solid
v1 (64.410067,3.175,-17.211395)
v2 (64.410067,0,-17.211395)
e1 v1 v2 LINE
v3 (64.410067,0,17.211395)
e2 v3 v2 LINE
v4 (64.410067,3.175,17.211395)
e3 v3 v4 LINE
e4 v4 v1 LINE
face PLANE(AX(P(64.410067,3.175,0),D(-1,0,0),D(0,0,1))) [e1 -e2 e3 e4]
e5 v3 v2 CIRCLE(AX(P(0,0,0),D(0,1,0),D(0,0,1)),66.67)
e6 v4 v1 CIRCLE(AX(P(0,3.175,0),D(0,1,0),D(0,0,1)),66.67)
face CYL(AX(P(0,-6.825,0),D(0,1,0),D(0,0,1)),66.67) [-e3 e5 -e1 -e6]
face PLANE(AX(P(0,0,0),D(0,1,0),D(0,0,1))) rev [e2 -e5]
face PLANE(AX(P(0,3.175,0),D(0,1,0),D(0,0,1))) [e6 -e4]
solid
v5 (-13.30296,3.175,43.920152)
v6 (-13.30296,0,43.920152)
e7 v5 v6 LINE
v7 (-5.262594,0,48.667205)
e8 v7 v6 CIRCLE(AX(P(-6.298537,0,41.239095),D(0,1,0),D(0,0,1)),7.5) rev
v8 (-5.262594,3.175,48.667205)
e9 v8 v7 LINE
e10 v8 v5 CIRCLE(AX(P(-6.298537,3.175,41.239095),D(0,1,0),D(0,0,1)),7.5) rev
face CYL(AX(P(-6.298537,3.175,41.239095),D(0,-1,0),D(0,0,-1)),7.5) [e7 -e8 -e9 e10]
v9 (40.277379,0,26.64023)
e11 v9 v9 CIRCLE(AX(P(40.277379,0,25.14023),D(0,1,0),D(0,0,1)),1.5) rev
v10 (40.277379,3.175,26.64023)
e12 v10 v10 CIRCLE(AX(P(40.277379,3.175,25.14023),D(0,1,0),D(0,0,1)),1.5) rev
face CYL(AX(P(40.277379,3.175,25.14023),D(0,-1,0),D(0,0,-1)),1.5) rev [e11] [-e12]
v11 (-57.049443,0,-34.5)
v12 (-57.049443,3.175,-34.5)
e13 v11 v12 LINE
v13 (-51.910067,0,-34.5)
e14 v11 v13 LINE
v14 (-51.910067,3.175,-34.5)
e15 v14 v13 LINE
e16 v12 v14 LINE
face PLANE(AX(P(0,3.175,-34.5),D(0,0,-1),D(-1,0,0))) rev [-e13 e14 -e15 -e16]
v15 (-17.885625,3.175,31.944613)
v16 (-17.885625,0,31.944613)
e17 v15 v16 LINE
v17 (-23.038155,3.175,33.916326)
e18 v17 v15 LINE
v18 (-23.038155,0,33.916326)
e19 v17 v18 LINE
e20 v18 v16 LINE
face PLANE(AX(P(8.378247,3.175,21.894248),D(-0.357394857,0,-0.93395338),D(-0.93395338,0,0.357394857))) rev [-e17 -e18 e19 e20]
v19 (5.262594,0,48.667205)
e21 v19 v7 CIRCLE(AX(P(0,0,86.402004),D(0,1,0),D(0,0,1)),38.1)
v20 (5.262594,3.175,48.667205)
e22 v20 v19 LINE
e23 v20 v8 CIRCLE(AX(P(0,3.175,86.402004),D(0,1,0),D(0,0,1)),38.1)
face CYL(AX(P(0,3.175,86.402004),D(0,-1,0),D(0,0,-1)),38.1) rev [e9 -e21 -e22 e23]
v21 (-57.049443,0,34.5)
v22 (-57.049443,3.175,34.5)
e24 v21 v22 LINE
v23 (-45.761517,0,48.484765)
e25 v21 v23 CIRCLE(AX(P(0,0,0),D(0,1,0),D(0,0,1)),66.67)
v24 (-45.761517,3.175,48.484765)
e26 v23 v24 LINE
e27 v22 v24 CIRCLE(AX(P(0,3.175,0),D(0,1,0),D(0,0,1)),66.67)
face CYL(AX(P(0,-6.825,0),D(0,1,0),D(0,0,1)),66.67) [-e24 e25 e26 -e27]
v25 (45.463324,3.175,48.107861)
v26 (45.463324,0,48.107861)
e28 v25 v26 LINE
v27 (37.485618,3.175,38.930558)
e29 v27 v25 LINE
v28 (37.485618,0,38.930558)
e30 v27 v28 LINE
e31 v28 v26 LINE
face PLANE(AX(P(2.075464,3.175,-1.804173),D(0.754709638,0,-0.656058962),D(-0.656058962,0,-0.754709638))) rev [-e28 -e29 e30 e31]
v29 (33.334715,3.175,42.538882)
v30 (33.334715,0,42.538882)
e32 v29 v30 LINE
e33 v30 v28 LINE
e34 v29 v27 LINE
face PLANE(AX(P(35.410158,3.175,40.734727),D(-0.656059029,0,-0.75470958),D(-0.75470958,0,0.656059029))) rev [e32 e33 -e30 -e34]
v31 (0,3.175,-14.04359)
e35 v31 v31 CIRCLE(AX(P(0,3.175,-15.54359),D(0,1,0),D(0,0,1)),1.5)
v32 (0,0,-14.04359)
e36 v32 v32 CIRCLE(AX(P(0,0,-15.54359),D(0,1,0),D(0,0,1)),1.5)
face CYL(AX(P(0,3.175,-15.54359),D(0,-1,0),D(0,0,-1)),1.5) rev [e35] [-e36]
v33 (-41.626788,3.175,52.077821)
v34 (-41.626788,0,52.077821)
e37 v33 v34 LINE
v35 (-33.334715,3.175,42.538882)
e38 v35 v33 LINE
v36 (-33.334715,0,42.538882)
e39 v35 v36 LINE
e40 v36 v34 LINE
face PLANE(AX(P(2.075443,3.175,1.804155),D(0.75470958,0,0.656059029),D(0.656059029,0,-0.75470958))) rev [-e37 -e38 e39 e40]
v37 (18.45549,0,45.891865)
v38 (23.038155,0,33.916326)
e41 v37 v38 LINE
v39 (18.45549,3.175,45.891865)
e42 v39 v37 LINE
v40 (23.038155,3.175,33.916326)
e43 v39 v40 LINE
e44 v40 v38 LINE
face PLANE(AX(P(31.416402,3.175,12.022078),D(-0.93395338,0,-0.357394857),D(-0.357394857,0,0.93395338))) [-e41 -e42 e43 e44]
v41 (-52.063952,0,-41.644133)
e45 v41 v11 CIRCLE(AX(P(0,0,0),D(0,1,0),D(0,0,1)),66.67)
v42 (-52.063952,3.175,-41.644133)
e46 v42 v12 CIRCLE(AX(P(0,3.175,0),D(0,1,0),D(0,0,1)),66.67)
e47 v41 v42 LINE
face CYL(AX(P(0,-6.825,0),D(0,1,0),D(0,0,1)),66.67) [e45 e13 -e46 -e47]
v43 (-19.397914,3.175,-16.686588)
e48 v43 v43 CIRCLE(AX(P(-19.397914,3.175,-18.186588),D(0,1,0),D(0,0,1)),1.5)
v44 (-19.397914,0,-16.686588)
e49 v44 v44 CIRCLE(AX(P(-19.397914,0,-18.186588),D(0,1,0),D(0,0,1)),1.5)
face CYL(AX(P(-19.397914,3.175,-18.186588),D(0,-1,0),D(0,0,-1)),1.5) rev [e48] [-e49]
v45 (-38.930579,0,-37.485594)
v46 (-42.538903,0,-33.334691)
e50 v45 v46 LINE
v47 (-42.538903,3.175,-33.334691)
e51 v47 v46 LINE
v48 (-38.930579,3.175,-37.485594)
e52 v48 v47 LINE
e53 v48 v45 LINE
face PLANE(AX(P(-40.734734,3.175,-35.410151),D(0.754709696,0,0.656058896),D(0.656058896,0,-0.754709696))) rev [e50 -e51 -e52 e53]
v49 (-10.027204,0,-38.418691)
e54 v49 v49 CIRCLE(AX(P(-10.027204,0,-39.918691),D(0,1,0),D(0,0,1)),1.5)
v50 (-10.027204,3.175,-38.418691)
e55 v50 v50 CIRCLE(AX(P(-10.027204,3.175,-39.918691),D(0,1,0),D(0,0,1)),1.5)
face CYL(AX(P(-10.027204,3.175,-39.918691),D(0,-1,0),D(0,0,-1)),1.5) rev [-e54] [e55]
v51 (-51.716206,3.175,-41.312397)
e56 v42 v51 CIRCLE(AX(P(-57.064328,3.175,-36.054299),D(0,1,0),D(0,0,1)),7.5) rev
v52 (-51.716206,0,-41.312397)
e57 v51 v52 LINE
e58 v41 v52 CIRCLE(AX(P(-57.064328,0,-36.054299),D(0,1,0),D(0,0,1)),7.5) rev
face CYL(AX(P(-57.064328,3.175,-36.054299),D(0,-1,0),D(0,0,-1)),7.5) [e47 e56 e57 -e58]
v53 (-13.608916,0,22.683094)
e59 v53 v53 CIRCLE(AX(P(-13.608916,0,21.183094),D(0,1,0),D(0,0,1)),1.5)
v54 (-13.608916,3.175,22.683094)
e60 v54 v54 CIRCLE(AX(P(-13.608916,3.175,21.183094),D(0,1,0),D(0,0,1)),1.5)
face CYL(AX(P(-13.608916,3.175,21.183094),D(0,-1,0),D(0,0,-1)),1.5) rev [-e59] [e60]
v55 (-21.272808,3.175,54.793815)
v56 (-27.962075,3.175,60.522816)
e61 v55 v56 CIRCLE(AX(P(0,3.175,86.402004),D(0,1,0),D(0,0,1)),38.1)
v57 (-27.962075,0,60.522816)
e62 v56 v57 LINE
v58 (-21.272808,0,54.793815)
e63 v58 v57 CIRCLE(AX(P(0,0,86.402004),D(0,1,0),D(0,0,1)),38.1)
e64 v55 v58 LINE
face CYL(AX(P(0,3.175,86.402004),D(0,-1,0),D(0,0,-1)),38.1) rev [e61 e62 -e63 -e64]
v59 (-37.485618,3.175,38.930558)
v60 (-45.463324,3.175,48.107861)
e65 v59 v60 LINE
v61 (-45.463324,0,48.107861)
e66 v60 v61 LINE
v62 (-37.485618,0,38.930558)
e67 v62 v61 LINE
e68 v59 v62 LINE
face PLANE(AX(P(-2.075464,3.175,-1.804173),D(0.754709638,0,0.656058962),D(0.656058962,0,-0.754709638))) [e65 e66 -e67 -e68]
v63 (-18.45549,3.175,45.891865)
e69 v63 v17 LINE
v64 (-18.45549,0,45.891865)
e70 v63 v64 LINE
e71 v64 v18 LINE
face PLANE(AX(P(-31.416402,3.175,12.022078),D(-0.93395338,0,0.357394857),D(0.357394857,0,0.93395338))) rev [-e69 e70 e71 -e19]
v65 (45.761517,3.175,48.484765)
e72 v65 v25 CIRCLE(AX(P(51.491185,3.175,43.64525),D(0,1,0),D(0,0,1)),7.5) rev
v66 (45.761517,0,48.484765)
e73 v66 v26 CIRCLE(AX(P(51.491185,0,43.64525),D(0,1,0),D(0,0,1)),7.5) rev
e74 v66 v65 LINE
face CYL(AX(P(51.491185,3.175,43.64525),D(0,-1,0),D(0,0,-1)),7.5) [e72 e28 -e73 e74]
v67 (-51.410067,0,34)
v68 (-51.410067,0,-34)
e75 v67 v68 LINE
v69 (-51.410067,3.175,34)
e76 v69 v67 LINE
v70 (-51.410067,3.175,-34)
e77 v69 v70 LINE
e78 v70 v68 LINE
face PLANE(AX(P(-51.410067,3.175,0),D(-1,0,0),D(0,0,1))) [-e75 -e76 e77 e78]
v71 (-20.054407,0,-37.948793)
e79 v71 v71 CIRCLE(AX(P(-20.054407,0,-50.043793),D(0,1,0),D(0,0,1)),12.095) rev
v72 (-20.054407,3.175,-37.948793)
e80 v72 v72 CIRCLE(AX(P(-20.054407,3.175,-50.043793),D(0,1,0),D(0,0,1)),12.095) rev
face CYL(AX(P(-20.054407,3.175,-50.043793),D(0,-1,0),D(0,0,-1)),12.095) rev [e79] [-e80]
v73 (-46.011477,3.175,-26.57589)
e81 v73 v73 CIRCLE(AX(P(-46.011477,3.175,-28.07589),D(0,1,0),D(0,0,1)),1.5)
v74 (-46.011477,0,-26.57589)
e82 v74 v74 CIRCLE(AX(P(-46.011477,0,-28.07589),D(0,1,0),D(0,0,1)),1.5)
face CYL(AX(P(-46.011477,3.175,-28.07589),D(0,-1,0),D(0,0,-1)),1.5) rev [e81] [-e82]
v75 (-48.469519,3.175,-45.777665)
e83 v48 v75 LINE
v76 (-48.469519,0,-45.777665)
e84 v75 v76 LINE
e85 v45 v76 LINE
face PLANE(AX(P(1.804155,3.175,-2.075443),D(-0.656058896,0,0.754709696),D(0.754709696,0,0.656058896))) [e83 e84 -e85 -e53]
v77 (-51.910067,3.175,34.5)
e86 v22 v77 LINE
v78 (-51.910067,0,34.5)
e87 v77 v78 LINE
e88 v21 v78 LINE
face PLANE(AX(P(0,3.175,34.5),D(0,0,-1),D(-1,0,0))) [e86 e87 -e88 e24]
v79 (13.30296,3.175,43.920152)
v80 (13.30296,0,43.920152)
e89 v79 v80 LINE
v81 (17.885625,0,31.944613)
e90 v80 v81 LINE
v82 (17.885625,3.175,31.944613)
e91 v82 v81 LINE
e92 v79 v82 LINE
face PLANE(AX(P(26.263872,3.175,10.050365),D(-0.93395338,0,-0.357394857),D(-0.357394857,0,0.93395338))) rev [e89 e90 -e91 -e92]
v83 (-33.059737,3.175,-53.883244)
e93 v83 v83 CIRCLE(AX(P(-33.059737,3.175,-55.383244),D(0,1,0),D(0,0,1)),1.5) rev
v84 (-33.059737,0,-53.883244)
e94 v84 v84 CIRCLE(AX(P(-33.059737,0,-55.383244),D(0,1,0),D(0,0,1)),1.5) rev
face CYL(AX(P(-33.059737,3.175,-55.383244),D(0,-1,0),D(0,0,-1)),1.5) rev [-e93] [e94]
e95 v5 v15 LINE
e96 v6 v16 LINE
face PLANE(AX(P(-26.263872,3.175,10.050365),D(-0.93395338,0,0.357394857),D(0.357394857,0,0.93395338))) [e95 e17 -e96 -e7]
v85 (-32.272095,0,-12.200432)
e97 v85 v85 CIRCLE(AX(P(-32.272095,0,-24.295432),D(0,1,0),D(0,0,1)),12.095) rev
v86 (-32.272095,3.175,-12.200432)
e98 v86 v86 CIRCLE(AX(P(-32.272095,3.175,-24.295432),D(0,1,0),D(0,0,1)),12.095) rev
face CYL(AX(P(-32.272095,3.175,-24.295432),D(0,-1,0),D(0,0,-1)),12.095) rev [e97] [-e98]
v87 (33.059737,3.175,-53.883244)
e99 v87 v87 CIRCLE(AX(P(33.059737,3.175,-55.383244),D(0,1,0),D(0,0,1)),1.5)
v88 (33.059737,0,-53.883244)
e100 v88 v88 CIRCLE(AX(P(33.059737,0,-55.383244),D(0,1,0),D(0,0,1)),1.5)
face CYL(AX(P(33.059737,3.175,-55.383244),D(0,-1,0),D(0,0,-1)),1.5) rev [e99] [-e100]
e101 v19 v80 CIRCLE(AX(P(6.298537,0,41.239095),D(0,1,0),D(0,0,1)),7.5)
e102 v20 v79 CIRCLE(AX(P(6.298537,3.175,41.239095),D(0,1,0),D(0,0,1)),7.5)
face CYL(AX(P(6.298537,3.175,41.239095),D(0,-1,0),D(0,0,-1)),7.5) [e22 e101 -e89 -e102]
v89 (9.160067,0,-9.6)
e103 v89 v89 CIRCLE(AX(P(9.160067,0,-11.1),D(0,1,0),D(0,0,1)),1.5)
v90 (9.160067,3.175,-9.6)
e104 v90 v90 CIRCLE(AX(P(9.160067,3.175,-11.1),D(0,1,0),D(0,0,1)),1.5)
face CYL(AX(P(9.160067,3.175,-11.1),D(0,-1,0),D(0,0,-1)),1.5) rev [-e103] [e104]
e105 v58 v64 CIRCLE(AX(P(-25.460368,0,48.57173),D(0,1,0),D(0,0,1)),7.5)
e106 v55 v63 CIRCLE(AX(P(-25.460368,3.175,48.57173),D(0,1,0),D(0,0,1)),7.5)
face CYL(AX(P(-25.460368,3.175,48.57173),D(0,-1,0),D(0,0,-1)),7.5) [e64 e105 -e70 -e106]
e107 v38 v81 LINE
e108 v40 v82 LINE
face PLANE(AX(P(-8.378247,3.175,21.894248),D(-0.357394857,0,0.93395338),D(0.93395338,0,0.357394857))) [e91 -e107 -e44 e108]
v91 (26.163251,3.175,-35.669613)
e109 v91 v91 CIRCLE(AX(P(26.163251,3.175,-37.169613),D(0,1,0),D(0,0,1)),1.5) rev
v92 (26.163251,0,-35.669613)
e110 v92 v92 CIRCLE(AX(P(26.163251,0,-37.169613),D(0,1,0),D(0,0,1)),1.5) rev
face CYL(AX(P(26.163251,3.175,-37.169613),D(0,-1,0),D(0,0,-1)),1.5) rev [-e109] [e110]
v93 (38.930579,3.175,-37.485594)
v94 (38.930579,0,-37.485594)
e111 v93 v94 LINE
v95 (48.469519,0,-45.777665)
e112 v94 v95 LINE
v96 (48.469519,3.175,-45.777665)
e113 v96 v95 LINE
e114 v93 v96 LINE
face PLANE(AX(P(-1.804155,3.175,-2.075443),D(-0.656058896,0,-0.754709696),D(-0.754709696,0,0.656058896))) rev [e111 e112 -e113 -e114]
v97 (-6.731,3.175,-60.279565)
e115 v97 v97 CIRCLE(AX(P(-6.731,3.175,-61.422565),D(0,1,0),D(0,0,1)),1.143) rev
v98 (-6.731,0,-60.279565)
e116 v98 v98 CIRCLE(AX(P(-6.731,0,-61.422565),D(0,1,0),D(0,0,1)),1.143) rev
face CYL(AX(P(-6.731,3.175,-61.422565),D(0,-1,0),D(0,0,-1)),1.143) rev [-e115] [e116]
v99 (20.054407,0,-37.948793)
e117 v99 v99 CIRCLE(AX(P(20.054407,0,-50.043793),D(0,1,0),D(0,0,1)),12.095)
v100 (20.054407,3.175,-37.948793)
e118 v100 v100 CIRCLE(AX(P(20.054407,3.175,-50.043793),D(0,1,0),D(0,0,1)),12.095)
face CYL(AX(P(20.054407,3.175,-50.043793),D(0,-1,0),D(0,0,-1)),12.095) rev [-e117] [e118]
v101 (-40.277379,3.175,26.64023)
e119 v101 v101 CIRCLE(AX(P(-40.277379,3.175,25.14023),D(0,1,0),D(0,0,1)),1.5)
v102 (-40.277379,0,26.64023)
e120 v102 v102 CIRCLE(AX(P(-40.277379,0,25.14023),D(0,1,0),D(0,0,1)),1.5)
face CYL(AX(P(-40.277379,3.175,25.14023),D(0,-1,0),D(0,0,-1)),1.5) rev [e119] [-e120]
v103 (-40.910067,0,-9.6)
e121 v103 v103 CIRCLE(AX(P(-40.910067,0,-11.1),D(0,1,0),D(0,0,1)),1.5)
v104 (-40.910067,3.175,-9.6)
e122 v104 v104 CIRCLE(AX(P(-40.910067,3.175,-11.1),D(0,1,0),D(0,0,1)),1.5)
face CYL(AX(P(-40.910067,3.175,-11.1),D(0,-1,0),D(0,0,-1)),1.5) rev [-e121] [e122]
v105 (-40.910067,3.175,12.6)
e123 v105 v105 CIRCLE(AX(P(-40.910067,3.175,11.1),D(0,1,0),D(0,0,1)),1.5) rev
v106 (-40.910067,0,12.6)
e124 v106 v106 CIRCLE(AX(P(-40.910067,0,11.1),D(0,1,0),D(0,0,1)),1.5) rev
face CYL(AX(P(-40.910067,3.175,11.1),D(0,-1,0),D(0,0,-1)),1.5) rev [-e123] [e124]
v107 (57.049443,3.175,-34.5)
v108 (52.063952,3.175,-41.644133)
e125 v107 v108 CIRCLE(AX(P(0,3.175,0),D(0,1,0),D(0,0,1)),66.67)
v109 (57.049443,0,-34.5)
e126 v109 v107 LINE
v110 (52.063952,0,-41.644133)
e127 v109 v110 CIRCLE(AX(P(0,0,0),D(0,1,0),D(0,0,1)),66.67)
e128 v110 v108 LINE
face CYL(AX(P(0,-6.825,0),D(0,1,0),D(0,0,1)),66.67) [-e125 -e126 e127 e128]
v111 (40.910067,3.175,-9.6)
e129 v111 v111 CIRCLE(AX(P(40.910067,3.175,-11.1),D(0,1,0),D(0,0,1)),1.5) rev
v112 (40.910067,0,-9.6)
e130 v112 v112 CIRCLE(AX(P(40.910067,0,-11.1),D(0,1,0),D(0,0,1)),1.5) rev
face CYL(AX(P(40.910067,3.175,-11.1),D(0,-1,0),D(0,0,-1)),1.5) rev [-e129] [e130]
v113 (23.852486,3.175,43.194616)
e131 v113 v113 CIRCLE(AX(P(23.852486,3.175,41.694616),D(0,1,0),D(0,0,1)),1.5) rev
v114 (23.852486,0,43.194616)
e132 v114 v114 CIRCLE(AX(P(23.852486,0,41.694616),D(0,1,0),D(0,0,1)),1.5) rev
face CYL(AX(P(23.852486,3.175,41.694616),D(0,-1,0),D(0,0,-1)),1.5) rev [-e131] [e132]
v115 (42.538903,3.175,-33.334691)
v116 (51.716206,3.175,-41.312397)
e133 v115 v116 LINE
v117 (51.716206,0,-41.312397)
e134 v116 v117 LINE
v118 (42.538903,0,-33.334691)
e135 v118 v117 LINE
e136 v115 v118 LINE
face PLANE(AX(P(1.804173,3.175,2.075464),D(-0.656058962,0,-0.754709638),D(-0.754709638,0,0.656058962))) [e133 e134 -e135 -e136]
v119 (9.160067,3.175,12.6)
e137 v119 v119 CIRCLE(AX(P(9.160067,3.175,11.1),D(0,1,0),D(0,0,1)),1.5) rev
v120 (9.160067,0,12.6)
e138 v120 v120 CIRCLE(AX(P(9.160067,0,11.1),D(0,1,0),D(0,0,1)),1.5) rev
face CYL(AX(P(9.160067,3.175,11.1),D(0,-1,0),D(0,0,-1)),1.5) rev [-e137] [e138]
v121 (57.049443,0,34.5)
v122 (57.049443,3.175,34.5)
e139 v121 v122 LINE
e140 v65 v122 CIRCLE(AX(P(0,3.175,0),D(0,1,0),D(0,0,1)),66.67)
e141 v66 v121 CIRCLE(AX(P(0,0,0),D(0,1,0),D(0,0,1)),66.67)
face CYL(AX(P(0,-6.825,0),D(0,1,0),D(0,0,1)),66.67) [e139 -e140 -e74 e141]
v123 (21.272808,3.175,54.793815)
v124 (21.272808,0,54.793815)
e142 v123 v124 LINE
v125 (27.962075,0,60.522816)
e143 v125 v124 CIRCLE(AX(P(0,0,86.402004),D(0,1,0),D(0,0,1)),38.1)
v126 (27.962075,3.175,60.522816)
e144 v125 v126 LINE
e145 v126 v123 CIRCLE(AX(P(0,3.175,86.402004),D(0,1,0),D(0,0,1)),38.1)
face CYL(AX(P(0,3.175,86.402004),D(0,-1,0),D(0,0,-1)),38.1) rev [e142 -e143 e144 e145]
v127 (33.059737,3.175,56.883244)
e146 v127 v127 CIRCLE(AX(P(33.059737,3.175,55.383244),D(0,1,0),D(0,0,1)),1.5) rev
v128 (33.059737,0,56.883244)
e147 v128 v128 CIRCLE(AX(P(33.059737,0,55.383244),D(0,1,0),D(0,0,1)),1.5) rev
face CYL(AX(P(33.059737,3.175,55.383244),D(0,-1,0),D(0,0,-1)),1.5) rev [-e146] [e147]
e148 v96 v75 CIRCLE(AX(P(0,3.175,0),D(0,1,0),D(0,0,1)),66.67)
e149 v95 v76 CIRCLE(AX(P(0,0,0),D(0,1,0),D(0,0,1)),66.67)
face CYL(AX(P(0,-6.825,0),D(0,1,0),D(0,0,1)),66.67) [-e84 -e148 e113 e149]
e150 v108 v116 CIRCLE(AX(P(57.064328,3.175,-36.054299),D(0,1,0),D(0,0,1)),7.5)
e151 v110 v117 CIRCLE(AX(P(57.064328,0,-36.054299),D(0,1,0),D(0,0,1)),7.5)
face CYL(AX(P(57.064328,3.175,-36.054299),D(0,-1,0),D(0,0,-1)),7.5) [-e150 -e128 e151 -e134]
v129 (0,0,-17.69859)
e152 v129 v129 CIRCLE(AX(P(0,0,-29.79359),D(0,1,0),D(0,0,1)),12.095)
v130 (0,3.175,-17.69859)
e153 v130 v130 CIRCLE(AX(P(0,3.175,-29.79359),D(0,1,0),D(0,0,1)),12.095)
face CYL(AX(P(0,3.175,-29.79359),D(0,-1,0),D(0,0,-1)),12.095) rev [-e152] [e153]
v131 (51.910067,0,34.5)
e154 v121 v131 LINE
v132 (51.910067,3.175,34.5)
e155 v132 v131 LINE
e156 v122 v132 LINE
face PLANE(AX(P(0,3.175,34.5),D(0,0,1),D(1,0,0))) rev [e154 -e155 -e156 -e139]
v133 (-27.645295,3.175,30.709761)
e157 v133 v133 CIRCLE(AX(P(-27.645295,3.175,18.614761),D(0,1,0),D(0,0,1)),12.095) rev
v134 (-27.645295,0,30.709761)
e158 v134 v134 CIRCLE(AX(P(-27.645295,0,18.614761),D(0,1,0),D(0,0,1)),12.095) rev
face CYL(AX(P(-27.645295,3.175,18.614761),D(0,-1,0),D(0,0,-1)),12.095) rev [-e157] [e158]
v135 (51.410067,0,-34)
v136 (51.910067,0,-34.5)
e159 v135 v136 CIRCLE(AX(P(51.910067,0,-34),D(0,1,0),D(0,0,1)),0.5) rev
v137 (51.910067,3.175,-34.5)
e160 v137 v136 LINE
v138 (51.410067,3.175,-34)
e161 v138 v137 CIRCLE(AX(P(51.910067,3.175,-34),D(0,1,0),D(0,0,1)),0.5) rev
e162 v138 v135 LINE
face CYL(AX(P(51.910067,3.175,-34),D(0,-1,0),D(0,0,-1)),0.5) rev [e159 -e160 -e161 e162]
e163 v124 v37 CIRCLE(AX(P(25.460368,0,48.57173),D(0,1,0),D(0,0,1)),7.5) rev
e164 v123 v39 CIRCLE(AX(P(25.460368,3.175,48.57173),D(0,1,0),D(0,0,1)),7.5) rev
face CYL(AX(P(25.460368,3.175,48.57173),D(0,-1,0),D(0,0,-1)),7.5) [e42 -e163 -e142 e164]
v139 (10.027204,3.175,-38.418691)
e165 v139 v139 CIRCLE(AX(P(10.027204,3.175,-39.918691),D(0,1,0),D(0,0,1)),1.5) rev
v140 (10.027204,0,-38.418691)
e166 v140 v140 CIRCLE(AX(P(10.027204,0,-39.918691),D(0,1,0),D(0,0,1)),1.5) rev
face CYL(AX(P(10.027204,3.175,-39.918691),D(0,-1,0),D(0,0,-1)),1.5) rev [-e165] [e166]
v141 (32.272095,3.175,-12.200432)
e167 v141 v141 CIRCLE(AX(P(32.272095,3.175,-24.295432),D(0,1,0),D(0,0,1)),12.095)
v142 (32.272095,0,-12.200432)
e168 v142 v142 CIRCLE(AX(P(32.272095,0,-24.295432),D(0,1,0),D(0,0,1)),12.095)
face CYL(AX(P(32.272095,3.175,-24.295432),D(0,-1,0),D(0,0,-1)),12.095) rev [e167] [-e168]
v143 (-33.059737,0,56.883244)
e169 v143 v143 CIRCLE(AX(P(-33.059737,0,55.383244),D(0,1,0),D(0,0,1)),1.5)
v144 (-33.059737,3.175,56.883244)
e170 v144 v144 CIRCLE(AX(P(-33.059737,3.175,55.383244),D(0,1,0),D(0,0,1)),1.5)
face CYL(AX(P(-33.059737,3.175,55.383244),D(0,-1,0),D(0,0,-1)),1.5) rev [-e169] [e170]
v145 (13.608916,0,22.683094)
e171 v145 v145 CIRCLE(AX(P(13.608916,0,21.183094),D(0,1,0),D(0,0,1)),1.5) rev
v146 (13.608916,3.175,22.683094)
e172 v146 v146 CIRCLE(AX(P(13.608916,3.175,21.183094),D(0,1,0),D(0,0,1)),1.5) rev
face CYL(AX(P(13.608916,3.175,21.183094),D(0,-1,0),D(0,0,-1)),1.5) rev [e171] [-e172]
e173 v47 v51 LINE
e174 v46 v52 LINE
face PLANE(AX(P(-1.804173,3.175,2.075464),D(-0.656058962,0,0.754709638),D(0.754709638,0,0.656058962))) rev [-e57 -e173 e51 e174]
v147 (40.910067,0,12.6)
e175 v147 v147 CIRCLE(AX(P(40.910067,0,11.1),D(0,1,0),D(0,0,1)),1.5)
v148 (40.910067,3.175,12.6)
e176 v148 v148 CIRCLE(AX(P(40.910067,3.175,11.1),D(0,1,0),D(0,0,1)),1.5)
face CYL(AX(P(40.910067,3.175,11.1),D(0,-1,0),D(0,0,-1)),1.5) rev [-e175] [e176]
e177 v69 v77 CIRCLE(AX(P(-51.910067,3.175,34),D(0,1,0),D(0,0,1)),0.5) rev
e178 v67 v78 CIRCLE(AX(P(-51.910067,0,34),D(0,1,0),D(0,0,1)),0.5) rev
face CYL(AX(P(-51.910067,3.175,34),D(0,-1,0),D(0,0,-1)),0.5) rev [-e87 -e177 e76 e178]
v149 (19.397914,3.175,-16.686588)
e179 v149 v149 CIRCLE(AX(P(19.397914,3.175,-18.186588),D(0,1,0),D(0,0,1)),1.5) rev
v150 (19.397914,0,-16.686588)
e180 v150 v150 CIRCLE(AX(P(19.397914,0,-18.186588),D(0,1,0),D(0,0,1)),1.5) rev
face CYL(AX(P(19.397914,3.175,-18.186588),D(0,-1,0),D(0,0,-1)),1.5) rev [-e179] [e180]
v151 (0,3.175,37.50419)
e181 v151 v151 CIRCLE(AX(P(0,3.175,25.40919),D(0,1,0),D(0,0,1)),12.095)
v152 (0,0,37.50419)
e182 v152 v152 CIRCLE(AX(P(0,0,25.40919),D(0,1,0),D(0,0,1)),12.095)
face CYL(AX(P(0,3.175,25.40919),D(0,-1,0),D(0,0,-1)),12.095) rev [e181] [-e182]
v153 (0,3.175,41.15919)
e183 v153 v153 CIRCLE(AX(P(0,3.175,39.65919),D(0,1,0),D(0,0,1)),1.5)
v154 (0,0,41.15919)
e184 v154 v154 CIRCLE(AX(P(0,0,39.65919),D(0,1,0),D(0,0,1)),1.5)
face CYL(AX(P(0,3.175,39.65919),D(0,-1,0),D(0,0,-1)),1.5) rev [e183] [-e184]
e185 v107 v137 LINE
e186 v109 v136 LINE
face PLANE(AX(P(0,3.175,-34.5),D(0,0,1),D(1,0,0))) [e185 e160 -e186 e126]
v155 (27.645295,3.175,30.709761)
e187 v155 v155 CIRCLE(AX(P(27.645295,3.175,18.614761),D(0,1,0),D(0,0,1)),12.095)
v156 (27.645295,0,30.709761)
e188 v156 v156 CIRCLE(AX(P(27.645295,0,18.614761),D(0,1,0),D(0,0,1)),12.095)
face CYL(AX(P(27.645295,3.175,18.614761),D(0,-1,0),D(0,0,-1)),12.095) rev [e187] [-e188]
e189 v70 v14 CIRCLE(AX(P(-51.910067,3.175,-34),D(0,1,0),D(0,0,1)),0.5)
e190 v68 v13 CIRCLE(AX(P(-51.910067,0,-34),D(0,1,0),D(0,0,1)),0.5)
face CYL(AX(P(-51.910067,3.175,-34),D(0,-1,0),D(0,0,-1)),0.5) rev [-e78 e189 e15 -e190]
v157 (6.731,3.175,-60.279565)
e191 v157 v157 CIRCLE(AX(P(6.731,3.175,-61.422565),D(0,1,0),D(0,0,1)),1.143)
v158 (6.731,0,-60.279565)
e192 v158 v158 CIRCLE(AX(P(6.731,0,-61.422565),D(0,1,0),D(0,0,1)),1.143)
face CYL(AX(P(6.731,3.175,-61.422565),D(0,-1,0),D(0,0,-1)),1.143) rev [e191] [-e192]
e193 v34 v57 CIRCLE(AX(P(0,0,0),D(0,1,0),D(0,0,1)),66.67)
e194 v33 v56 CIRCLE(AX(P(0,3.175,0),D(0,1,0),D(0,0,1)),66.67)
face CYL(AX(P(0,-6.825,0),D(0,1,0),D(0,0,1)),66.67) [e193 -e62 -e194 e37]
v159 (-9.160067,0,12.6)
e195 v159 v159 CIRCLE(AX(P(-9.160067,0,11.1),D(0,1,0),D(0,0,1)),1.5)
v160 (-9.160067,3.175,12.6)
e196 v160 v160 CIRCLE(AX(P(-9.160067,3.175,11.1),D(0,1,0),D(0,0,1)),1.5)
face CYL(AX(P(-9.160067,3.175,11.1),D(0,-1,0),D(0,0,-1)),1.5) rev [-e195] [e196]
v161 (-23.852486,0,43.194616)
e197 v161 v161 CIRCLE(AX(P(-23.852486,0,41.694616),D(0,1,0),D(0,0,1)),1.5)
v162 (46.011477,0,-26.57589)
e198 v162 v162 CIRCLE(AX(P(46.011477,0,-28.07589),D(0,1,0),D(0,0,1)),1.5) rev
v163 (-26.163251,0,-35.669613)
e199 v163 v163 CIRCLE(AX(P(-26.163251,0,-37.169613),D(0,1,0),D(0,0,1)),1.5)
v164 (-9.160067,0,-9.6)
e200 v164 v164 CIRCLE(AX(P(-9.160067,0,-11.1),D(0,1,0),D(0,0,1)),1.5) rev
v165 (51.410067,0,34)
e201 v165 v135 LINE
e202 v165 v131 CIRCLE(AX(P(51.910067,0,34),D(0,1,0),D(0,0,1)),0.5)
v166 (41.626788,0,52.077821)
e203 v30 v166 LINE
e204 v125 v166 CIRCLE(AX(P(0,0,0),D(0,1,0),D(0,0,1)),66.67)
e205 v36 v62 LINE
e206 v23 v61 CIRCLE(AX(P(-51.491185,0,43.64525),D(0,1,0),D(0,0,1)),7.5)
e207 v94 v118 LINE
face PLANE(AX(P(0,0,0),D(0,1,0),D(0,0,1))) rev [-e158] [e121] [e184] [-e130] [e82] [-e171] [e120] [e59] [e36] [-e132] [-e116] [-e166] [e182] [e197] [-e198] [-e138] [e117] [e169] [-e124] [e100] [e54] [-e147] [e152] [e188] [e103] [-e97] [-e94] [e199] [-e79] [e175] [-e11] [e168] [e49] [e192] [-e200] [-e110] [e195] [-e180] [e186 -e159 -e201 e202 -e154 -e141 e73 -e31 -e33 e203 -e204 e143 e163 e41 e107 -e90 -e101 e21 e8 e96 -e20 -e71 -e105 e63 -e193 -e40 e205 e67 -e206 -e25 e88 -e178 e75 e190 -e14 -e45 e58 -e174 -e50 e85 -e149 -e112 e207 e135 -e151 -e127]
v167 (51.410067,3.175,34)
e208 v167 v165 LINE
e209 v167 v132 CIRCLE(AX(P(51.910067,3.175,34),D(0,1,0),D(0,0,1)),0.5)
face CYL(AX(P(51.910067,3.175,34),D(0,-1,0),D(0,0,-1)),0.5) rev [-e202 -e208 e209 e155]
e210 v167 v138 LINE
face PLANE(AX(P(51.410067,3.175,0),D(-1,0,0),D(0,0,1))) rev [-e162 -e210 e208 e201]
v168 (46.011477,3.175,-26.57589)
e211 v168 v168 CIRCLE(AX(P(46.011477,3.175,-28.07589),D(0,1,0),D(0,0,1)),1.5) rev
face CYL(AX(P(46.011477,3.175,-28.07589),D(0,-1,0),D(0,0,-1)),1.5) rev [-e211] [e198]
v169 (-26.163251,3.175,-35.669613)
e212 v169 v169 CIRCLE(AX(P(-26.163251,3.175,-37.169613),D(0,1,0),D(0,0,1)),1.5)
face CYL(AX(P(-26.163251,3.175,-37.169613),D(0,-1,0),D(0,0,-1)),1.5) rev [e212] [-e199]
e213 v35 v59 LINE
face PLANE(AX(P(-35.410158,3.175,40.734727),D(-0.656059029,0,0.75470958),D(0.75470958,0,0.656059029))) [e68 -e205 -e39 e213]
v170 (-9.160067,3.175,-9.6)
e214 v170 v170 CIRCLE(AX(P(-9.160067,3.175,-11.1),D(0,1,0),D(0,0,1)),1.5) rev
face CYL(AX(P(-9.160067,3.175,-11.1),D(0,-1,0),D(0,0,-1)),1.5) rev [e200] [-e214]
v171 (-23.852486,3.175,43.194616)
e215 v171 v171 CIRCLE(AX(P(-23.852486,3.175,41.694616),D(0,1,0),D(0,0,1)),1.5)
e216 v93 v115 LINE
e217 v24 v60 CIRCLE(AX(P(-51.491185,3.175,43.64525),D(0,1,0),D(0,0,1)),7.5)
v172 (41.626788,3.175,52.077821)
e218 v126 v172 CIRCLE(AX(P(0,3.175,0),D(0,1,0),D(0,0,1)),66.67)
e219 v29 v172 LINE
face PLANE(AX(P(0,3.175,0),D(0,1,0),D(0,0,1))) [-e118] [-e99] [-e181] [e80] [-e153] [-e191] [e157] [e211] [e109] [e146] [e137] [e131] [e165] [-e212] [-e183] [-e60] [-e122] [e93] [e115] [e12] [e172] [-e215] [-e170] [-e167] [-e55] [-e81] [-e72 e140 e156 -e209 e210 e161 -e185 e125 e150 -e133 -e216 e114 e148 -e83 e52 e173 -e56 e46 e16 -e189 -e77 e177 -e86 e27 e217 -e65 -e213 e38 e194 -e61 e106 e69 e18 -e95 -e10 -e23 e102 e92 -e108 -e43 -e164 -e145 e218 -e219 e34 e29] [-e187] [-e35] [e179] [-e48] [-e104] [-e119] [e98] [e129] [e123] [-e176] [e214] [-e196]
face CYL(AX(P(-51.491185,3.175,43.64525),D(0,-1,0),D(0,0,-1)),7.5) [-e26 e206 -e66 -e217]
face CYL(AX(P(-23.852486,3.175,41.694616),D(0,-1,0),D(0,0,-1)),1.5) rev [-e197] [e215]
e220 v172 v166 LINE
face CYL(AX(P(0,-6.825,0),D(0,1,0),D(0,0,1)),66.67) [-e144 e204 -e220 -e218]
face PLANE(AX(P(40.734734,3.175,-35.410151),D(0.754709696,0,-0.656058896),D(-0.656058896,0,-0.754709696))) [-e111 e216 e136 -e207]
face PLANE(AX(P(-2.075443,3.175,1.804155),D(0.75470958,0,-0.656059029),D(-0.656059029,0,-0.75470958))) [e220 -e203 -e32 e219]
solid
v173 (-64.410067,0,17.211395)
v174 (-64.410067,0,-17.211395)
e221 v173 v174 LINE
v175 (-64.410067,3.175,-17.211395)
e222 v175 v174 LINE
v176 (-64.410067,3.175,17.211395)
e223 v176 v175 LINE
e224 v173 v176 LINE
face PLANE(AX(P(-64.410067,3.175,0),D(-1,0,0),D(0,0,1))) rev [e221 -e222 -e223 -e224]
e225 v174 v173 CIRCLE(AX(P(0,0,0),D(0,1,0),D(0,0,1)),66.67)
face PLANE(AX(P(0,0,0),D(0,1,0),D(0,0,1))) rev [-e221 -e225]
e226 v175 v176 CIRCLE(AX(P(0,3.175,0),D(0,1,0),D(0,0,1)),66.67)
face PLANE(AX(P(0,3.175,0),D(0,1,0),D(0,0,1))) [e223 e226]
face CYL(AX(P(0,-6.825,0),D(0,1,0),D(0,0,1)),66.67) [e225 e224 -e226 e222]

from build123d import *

# Parameters (mm, degrees)
BOSS_EXTRUDE1_OUTLINE_R   = 1.5
BOSS_EXTRUDE1_OUTLINE_R_2 = 12.095
BOSS_EXTRUDE1_OUTLINE_R_3 = 1.143
BOSS_EXTRUDE1_DEPTH       = 3.175
SKETCH2_R                 = 88.839180513
SKETCH2_R_2               = 66.67
CUT_EXTRUDE1_DEPTH        = 10


# Read off the part's stored shape, not the designer's step: Boss-Extrude1
with BuildPart() as part:
    # Boss-Extrude1 outline → Boss-Extrude1 (new body)
    with BuildSketch(Plane(origin=(0, 0, 0), x_dir=(1, 0, 0), z_dir=(0, 1, 0))):
        with BuildLine():
            Line((-45.463324447, -48.107860638), (-37.485618015, -38.930557561))
            Line((-37.485618015, -38.930557561), (-33.334715323, -42.538882221))
            Line((-33.334715323, -42.538882221), (-41.689597364, -52.150074566))
            ThreePointArc((-41.689597364, -52.150074566), (-43.455441803, -58.16401862), (-40.038526845, -63.418580622))
            ThreePointArc((-40.038526845, -63.418580622), (-37.79111892, -64.782955558), (-35.49727084, -66.067721036))
            ThreePointArc((-35.49727084, -66.067721036), (-33.357679643, -66.33740492), (-31.589980006, -65.102164912))
            ThreePointArc((-31.589980006, -65.102164912), (-26.929242455, -59.449715082), (-21.272807595, -54.79381471))
            ThreePointArc((-21.272807595, -54.79381471), (-18.309924074, -50.834725832), (-18.455489673, -45.891864903))
            Line((-18.455489673, -45.891864903), (-23.038155213, -33.91632612))
            Line((-23.038155213, -33.91632612), (-17.885625128, -31.944613407))
            Line((-17.885625128, -31.944613407), (-13.302959587, -43.920152189))
            ThreePointArc((-13.302959587, -43.920152189), (-10.111582251, -47.697475872), (-5.262593756, -48.667204744))
            ThreePointArc((-5.262593756, -48.667204744), (0, -48.302004425), (5.262593756, -48.667204744))
            ThreePointArc((5.262593756, -48.667204744), (10.111582251, -47.697475872), (13.302959587, -43.920152189))
            Line((13.302959587, -43.920152189), (17.885625128, -31.944613407))
            Line((17.885625128, -31.944613407), (23.038155213, -33.91632612))
            Line((23.038155213, -33.91632612), (18.455489673, -45.891864903))
            ThreePointArc((18.455489673, -45.891864903), (18.309924074, -50.834725832), (21.272807595, -54.79381471))
            ThreePointArc((21.272807595, -54.79381471), (26.929242455, -59.449715082), (31.589980006, -65.102164912))
            ThreePointArc((31.589980006, -65.102164912), (33.357679643, -66.33740492), (35.49727084, -66.067721036))
            ThreePointArc((35.49727084, -66.067721036), (37.79111892, -64.782955558), (40.038526845, -63.418580622))
            ThreePointArc((40.038526845, -63.418580622), (43.455441803, -58.16401862), (41.689597364, -52.150074566))
            Line((41.689597364, -52.150074566), (33.334715323, -42.538882221))
            Line((33.334715323, -42.538882221), (37.485618015, -38.930557561))
            Line((37.485618015, -38.930557561), (45.463324447, -48.107860638))
            ThreePointArc((45.463324447, -48.107860638), (51.244367279, -51.141187567), (57.212428046, -48.494722157))
            ThreePointArc((57.212428046, -48.494722157), (74.817303308, -5.231742133), (63.404808562, 40.06033264))
            ThreePointArc((63.404808562, 40.06033264), (57.863145959, 43.511637332), (51.716205935, 41.312397275))
            Line((51.716205935, 41.312397275), (42.538902858, 33.334690843))
            Line((42.538902858, 33.334690843), (38.930578931, 37.485594171))
            Line((38.930578931, 37.485594171), (48.541772751, 45.840474516))
            ThreePointArc((48.541772751, 45.840474516), (51.127412363, 51.550132777), (48.475045278, 57.229100861))
            ThreePointArc((48.475045278, 57.229100861), (0, 75), (-48.475045278, 57.229100861))
            ThreePointArc((-48.475045278, 57.229100861), (-51.127412363, 51.550132777), (-48.541772751, 45.840474516))
            Line((-48.541772751, 45.840474516), (-38.930578931, 37.485594171))
            Line((-38.930578931, 37.485594171), (-42.538902858, 33.334690843))
            Line((-42.538902858, 33.334690843), (-51.716205935, 41.312397275))
            ThreePointArc((-51.716205935, 41.312397275), (-57.863145959, 43.511637332), (-63.404808562, 40.06033264))
            ThreePointArc((-63.404808562, 40.06033264), (-74.817303308, -5.231742133), (-57.212428046, -48.494722157))
            ThreePointArc((-57.212428046, -48.494722157), (-51.244367279, -51.141187567), (-45.463324447, -48.107860638))
        make_face()
        with Locations((-33.059737365, -55.383244446)):
            Circle(BOSS_EXTRUDE1_OUTLINE_R, mode=Mode.SUBTRACT)
        with Locations((-23.852486199, -41.694616163)):
            Circle(BOSS_EXTRUDE1_OUTLINE_R, mode=Mode.SUBTRACT)
        with Locations((-40.277379234, -25.14022965)):
            Circle(BOSS_EXTRUDE1_OUTLINE_R, mode=Mode.SUBTRACT)
        with BuildLine():
            Line((-64.410067426, -34), (-64.410067426, 34))
            ThreePointArc((-64.410067426, 34), (-64.263620817, 34.353553391), (-63.910067426, 34.5))
            Line((-63.910067426, 34.5), (-51.910067426, 34.5))
            ThreePointArc((-51.910067426, 34.5), (-51.556514035, 34.353553391), (-51.410067426, 34))
            Line((-51.410067426, 34), (-51.410067426, -34))
            ThreePointArc((-51.410067426, -34), (-51.556514035, -34.353553391), (-51.910067426, -34.5))
            Line((-51.910067426, -34.5), (-63.910067426, -34.5))
            ThreePointArc((-63.910067426, -34.5), (-64.263620817, -34.353553391), (-64.410067426, -34))
        make_face(mode=Mode.SUBTRACT)
        with Locations((-40.910067426, -11.1)):
            Circle(BOSS_EXTRUDE1_OUTLINE_R, mode=Mode.SUBTRACT)
        with Locations((-27.645294552, -18.614761308)):
            Circle(BOSS_EXTRUDE1_OUTLINE_R_2, mode=Mode.SUBTRACT)
        with Locations((-13.608916499, -21.183093811)):
            Circle(BOSS_EXTRUDE1_OUTLINE_R, mode=Mode.SUBTRACT)
        with Locations((-9.160067426, -11.1)):
            Circle(BOSS_EXTRUDE1_OUTLINE_R, mode=Mode.SUBTRACT)
        with Locations((33.059737365, -55.383244446)):
            Circle(BOSS_EXTRUDE1_OUTLINE_R, mode=Mode.SUBTRACT)
        with Locations((0, -39.659190322)):
            Circle(BOSS_EXTRUDE1_OUTLINE_R, mode=Mode.SUBTRACT)
        with Locations((23.852486199, -41.694616163)):
            Circle(BOSS_EXTRUDE1_OUTLINE_R, mode=Mode.SUBTRACT)
        with Locations((0, -25.409190322)):
            Circle(BOSS_EXTRUDE1_OUTLINE_R_2, mode=Mode.SUBTRACT)
        with Locations((13.608916499, -21.183093811)):
            Circle(BOSS_EXTRUDE1_OUTLINE_R, mode=Mode.SUBTRACT)
        with Locations((27.645294552, -18.614761308)):
            Circle(BOSS_EXTRUDE1_OUTLINE_R_2, mode=Mode.SUBTRACT)
        with Locations((9.160067426, -11.1)):
            Circle(BOSS_EXTRUDE1_OUTLINE_R, mode=Mode.SUBTRACT)
        with Locations((40.277379234, -25.14022965)):
            Circle(BOSS_EXTRUDE1_OUTLINE_R, mode=Mode.SUBTRACT)
        with Locations((40.910067426, -11.1)):
            Circle(BOSS_EXTRUDE1_OUTLINE_R, mode=Mode.SUBTRACT)
        with BuildLine():
            ThreePointArc((63.910067426, 34.5), (64.263620817, 34.353553391), (64.410067426, 34))
            Line((64.410067426, 34), (64.410067426, -34))
            ThreePointArc((64.410067426, -34), (64.263620817, -34.353553391), (63.910067426, -34.5))
            Line((63.910067426, -34.5), (51.910067426, -34.5))
            ThreePointArc((51.910067426, -34.5), (51.556514035, -34.353553391), (51.410067426, -34))
            Line((51.410067426, -34), (51.410067426, 34))
            ThreePointArc((51.410067426, 34), (51.556514035, 34.353553391), (51.910067426, 34.5))
            Line((51.910067426, 34.5), (63.910067426, 34.5))
        make_face(mode=Mode.SUBTRACT)
        with Locations((-40.910067426, 11.1)):
            Circle(BOSS_EXTRUDE1_OUTLINE_R, mode=Mode.SUBTRACT)
        with Locations((-46.011477091, 28.075890486)):
            Circle(BOSS_EXTRUDE1_OUTLINE_R, mode=Mode.SUBTRACT)
        with Locations((-19.397913834, 18.186588214)):
            Circle(BOSS_EXTRUDE1_OUTLINE_R, mode=Mode.SUBTRACT)
        with Locations((-9.160067426, 11.1)):
            Circle(BOSS_EXTRUDE1_OUTLINE_R, mode=Mode.SUBTRACT)
        with Locations((-32.272094543, 24.295431891)):
            Circle(BOSS_EXTRUDE1_OUTLINE_R_2, mode=Mode.SUBTRACT)
        with Locations((-26.163250867, 37.1696126)):
            Circle(BOSS_EXTRUDE1_OUTLINE_R, mode=Mode.SUBTRACT)
        with Locations((-33.059737365, 55.383244446)):
            Circle(BOSS_EXTRUDE1_OUTLINE_R, mode=Mode.SUBTRACT)
        with Locations((-20.05440719, 50.04379331)):
            Circle(BOSS_EXTRUDE1_OUTLINE_R_2, mode=Mode.SUBTRACT)
        with Locations((-10.027203595, 39.91869143)):
            Circle(BOSS_EXTRUDE1_OUTLINE_R, mode=Mode.SUBTRACT)
        with Locations((-6.731, 61.422565207)):
            Circle(BOSS_EXTRUDE1_OUTLINE_R_3, mode=Mode.SUBTRACT)
        with Locations((9.160067426, 11.1)):
            Circle(BOSS_EXTRUDE1_OUTLINE_R, mode=Mode.SUBTRACT)
        with Locations((0, 15.543589551)):
            Circle(BOSS_EXTRUDE1_OUTLINE_R, mode=Mode.SUBTRACT)
        with Locations((19.397913834, 18.186588214)):
            Circle(BOSS_EXTRUDE1_OUTLINE_R, mode=Mode.SUBTRACT)
        with Locations((0, 29.793589551)):
            Circle(BOSS_EXTRUDE1_OUTLINE_R_2, mode=Mode.SUBTRACT)
        with Locations((32.272094543, 24.295431891)):
            Circle(BOSS_EXTRUDE1_OUTLINE_R_2, mode=Mode.SUBTRACT)
        with Locations((26.163250867, 37.1696126)):
            Circle(BOSS_EXTRUDE1_OUTLINE_R, mode=Mode.SUBTRACT)
        with Locations((40.910067426, 11.1)):
            Circle(BOSS_EXTRUDE1_OUTLINE_R, mode=Mode.SUBTRACT)
        with Locations((46.011477091, 28.075890486)):
            Circle(BOSS_EXTRUDE1_OUTLINE_R, mode=Mode.SUBTRACT)
        with Locations((10.027203595, 39.91869143)):
            Circle(BOSS_EXTRUDE1_OUTLINE_R, mode=Mode.SUBTRACT)
        with Locations((20.05440719, 50.04379331)):
            Circle(BOSS_EXTRUDE1_OUTLINE_R_2, mode=Mode.SUBTRACT)
        with Locations((33.059737365, 55.383244446)):
            Circle(BOSS_EXTRUDE1_OUTLINE_R, mode=Mode.SUBTRACT)
        with Locations((6.731, 61.422565207)):
            Circle(BOSS_EXTRUDE1_OUTLINE_R_3, mode=Mode.SUBTRACT)
    extrude(amount=BOSS_EXTRUDE1_DEPTH)

    # Sketch2 → Cut-Extrude1 (cut)
    with BuildSketch(Plane(origin=(0, 3.175, 0), x_dir=(1, 0, 0), z_dir=(0, 1, 0))):
        Circle(SKETCH2_R)
        Circle(SKETCH2_R_2, mode=Mode.SUBTRACT)
    extrude(amount=-CUT_EXTRUDE1_DEPTH, mode=Mode.SUBTRACT)


with BuildPart() as cut_extrude1_piece_1:
    # of the separate pieces the step leaves, piece 1, a body of its own (cut_extrude1_pieces)
    add(part.part.solids().sort_by_distance((-45.761517323, 0, 48.484764951))[0])


with BuildPart() as cut_extrude1_piece_2:
    # of the separate pieces the step leaves, piece 2, a body of its own (cut_extrude1_pieces)
    add(part.part.solids().sort_by_distance((64.410067426, 0, -17.211394893))[0])


with BuildPart() as cut_extrude1_piece_3:
    # of the separate pieces the step leaves, piece 3, a body of its own (cut_extrude1_pieces)
    add(part.part.solids().sort_by_distance((-64.410067426, 0, -17.211394893))[0])


solid = Compound([cut_extrude1_piece_1.part, cut_extrude1_piece_2.part, cut_extrude1_piece_3.part])
